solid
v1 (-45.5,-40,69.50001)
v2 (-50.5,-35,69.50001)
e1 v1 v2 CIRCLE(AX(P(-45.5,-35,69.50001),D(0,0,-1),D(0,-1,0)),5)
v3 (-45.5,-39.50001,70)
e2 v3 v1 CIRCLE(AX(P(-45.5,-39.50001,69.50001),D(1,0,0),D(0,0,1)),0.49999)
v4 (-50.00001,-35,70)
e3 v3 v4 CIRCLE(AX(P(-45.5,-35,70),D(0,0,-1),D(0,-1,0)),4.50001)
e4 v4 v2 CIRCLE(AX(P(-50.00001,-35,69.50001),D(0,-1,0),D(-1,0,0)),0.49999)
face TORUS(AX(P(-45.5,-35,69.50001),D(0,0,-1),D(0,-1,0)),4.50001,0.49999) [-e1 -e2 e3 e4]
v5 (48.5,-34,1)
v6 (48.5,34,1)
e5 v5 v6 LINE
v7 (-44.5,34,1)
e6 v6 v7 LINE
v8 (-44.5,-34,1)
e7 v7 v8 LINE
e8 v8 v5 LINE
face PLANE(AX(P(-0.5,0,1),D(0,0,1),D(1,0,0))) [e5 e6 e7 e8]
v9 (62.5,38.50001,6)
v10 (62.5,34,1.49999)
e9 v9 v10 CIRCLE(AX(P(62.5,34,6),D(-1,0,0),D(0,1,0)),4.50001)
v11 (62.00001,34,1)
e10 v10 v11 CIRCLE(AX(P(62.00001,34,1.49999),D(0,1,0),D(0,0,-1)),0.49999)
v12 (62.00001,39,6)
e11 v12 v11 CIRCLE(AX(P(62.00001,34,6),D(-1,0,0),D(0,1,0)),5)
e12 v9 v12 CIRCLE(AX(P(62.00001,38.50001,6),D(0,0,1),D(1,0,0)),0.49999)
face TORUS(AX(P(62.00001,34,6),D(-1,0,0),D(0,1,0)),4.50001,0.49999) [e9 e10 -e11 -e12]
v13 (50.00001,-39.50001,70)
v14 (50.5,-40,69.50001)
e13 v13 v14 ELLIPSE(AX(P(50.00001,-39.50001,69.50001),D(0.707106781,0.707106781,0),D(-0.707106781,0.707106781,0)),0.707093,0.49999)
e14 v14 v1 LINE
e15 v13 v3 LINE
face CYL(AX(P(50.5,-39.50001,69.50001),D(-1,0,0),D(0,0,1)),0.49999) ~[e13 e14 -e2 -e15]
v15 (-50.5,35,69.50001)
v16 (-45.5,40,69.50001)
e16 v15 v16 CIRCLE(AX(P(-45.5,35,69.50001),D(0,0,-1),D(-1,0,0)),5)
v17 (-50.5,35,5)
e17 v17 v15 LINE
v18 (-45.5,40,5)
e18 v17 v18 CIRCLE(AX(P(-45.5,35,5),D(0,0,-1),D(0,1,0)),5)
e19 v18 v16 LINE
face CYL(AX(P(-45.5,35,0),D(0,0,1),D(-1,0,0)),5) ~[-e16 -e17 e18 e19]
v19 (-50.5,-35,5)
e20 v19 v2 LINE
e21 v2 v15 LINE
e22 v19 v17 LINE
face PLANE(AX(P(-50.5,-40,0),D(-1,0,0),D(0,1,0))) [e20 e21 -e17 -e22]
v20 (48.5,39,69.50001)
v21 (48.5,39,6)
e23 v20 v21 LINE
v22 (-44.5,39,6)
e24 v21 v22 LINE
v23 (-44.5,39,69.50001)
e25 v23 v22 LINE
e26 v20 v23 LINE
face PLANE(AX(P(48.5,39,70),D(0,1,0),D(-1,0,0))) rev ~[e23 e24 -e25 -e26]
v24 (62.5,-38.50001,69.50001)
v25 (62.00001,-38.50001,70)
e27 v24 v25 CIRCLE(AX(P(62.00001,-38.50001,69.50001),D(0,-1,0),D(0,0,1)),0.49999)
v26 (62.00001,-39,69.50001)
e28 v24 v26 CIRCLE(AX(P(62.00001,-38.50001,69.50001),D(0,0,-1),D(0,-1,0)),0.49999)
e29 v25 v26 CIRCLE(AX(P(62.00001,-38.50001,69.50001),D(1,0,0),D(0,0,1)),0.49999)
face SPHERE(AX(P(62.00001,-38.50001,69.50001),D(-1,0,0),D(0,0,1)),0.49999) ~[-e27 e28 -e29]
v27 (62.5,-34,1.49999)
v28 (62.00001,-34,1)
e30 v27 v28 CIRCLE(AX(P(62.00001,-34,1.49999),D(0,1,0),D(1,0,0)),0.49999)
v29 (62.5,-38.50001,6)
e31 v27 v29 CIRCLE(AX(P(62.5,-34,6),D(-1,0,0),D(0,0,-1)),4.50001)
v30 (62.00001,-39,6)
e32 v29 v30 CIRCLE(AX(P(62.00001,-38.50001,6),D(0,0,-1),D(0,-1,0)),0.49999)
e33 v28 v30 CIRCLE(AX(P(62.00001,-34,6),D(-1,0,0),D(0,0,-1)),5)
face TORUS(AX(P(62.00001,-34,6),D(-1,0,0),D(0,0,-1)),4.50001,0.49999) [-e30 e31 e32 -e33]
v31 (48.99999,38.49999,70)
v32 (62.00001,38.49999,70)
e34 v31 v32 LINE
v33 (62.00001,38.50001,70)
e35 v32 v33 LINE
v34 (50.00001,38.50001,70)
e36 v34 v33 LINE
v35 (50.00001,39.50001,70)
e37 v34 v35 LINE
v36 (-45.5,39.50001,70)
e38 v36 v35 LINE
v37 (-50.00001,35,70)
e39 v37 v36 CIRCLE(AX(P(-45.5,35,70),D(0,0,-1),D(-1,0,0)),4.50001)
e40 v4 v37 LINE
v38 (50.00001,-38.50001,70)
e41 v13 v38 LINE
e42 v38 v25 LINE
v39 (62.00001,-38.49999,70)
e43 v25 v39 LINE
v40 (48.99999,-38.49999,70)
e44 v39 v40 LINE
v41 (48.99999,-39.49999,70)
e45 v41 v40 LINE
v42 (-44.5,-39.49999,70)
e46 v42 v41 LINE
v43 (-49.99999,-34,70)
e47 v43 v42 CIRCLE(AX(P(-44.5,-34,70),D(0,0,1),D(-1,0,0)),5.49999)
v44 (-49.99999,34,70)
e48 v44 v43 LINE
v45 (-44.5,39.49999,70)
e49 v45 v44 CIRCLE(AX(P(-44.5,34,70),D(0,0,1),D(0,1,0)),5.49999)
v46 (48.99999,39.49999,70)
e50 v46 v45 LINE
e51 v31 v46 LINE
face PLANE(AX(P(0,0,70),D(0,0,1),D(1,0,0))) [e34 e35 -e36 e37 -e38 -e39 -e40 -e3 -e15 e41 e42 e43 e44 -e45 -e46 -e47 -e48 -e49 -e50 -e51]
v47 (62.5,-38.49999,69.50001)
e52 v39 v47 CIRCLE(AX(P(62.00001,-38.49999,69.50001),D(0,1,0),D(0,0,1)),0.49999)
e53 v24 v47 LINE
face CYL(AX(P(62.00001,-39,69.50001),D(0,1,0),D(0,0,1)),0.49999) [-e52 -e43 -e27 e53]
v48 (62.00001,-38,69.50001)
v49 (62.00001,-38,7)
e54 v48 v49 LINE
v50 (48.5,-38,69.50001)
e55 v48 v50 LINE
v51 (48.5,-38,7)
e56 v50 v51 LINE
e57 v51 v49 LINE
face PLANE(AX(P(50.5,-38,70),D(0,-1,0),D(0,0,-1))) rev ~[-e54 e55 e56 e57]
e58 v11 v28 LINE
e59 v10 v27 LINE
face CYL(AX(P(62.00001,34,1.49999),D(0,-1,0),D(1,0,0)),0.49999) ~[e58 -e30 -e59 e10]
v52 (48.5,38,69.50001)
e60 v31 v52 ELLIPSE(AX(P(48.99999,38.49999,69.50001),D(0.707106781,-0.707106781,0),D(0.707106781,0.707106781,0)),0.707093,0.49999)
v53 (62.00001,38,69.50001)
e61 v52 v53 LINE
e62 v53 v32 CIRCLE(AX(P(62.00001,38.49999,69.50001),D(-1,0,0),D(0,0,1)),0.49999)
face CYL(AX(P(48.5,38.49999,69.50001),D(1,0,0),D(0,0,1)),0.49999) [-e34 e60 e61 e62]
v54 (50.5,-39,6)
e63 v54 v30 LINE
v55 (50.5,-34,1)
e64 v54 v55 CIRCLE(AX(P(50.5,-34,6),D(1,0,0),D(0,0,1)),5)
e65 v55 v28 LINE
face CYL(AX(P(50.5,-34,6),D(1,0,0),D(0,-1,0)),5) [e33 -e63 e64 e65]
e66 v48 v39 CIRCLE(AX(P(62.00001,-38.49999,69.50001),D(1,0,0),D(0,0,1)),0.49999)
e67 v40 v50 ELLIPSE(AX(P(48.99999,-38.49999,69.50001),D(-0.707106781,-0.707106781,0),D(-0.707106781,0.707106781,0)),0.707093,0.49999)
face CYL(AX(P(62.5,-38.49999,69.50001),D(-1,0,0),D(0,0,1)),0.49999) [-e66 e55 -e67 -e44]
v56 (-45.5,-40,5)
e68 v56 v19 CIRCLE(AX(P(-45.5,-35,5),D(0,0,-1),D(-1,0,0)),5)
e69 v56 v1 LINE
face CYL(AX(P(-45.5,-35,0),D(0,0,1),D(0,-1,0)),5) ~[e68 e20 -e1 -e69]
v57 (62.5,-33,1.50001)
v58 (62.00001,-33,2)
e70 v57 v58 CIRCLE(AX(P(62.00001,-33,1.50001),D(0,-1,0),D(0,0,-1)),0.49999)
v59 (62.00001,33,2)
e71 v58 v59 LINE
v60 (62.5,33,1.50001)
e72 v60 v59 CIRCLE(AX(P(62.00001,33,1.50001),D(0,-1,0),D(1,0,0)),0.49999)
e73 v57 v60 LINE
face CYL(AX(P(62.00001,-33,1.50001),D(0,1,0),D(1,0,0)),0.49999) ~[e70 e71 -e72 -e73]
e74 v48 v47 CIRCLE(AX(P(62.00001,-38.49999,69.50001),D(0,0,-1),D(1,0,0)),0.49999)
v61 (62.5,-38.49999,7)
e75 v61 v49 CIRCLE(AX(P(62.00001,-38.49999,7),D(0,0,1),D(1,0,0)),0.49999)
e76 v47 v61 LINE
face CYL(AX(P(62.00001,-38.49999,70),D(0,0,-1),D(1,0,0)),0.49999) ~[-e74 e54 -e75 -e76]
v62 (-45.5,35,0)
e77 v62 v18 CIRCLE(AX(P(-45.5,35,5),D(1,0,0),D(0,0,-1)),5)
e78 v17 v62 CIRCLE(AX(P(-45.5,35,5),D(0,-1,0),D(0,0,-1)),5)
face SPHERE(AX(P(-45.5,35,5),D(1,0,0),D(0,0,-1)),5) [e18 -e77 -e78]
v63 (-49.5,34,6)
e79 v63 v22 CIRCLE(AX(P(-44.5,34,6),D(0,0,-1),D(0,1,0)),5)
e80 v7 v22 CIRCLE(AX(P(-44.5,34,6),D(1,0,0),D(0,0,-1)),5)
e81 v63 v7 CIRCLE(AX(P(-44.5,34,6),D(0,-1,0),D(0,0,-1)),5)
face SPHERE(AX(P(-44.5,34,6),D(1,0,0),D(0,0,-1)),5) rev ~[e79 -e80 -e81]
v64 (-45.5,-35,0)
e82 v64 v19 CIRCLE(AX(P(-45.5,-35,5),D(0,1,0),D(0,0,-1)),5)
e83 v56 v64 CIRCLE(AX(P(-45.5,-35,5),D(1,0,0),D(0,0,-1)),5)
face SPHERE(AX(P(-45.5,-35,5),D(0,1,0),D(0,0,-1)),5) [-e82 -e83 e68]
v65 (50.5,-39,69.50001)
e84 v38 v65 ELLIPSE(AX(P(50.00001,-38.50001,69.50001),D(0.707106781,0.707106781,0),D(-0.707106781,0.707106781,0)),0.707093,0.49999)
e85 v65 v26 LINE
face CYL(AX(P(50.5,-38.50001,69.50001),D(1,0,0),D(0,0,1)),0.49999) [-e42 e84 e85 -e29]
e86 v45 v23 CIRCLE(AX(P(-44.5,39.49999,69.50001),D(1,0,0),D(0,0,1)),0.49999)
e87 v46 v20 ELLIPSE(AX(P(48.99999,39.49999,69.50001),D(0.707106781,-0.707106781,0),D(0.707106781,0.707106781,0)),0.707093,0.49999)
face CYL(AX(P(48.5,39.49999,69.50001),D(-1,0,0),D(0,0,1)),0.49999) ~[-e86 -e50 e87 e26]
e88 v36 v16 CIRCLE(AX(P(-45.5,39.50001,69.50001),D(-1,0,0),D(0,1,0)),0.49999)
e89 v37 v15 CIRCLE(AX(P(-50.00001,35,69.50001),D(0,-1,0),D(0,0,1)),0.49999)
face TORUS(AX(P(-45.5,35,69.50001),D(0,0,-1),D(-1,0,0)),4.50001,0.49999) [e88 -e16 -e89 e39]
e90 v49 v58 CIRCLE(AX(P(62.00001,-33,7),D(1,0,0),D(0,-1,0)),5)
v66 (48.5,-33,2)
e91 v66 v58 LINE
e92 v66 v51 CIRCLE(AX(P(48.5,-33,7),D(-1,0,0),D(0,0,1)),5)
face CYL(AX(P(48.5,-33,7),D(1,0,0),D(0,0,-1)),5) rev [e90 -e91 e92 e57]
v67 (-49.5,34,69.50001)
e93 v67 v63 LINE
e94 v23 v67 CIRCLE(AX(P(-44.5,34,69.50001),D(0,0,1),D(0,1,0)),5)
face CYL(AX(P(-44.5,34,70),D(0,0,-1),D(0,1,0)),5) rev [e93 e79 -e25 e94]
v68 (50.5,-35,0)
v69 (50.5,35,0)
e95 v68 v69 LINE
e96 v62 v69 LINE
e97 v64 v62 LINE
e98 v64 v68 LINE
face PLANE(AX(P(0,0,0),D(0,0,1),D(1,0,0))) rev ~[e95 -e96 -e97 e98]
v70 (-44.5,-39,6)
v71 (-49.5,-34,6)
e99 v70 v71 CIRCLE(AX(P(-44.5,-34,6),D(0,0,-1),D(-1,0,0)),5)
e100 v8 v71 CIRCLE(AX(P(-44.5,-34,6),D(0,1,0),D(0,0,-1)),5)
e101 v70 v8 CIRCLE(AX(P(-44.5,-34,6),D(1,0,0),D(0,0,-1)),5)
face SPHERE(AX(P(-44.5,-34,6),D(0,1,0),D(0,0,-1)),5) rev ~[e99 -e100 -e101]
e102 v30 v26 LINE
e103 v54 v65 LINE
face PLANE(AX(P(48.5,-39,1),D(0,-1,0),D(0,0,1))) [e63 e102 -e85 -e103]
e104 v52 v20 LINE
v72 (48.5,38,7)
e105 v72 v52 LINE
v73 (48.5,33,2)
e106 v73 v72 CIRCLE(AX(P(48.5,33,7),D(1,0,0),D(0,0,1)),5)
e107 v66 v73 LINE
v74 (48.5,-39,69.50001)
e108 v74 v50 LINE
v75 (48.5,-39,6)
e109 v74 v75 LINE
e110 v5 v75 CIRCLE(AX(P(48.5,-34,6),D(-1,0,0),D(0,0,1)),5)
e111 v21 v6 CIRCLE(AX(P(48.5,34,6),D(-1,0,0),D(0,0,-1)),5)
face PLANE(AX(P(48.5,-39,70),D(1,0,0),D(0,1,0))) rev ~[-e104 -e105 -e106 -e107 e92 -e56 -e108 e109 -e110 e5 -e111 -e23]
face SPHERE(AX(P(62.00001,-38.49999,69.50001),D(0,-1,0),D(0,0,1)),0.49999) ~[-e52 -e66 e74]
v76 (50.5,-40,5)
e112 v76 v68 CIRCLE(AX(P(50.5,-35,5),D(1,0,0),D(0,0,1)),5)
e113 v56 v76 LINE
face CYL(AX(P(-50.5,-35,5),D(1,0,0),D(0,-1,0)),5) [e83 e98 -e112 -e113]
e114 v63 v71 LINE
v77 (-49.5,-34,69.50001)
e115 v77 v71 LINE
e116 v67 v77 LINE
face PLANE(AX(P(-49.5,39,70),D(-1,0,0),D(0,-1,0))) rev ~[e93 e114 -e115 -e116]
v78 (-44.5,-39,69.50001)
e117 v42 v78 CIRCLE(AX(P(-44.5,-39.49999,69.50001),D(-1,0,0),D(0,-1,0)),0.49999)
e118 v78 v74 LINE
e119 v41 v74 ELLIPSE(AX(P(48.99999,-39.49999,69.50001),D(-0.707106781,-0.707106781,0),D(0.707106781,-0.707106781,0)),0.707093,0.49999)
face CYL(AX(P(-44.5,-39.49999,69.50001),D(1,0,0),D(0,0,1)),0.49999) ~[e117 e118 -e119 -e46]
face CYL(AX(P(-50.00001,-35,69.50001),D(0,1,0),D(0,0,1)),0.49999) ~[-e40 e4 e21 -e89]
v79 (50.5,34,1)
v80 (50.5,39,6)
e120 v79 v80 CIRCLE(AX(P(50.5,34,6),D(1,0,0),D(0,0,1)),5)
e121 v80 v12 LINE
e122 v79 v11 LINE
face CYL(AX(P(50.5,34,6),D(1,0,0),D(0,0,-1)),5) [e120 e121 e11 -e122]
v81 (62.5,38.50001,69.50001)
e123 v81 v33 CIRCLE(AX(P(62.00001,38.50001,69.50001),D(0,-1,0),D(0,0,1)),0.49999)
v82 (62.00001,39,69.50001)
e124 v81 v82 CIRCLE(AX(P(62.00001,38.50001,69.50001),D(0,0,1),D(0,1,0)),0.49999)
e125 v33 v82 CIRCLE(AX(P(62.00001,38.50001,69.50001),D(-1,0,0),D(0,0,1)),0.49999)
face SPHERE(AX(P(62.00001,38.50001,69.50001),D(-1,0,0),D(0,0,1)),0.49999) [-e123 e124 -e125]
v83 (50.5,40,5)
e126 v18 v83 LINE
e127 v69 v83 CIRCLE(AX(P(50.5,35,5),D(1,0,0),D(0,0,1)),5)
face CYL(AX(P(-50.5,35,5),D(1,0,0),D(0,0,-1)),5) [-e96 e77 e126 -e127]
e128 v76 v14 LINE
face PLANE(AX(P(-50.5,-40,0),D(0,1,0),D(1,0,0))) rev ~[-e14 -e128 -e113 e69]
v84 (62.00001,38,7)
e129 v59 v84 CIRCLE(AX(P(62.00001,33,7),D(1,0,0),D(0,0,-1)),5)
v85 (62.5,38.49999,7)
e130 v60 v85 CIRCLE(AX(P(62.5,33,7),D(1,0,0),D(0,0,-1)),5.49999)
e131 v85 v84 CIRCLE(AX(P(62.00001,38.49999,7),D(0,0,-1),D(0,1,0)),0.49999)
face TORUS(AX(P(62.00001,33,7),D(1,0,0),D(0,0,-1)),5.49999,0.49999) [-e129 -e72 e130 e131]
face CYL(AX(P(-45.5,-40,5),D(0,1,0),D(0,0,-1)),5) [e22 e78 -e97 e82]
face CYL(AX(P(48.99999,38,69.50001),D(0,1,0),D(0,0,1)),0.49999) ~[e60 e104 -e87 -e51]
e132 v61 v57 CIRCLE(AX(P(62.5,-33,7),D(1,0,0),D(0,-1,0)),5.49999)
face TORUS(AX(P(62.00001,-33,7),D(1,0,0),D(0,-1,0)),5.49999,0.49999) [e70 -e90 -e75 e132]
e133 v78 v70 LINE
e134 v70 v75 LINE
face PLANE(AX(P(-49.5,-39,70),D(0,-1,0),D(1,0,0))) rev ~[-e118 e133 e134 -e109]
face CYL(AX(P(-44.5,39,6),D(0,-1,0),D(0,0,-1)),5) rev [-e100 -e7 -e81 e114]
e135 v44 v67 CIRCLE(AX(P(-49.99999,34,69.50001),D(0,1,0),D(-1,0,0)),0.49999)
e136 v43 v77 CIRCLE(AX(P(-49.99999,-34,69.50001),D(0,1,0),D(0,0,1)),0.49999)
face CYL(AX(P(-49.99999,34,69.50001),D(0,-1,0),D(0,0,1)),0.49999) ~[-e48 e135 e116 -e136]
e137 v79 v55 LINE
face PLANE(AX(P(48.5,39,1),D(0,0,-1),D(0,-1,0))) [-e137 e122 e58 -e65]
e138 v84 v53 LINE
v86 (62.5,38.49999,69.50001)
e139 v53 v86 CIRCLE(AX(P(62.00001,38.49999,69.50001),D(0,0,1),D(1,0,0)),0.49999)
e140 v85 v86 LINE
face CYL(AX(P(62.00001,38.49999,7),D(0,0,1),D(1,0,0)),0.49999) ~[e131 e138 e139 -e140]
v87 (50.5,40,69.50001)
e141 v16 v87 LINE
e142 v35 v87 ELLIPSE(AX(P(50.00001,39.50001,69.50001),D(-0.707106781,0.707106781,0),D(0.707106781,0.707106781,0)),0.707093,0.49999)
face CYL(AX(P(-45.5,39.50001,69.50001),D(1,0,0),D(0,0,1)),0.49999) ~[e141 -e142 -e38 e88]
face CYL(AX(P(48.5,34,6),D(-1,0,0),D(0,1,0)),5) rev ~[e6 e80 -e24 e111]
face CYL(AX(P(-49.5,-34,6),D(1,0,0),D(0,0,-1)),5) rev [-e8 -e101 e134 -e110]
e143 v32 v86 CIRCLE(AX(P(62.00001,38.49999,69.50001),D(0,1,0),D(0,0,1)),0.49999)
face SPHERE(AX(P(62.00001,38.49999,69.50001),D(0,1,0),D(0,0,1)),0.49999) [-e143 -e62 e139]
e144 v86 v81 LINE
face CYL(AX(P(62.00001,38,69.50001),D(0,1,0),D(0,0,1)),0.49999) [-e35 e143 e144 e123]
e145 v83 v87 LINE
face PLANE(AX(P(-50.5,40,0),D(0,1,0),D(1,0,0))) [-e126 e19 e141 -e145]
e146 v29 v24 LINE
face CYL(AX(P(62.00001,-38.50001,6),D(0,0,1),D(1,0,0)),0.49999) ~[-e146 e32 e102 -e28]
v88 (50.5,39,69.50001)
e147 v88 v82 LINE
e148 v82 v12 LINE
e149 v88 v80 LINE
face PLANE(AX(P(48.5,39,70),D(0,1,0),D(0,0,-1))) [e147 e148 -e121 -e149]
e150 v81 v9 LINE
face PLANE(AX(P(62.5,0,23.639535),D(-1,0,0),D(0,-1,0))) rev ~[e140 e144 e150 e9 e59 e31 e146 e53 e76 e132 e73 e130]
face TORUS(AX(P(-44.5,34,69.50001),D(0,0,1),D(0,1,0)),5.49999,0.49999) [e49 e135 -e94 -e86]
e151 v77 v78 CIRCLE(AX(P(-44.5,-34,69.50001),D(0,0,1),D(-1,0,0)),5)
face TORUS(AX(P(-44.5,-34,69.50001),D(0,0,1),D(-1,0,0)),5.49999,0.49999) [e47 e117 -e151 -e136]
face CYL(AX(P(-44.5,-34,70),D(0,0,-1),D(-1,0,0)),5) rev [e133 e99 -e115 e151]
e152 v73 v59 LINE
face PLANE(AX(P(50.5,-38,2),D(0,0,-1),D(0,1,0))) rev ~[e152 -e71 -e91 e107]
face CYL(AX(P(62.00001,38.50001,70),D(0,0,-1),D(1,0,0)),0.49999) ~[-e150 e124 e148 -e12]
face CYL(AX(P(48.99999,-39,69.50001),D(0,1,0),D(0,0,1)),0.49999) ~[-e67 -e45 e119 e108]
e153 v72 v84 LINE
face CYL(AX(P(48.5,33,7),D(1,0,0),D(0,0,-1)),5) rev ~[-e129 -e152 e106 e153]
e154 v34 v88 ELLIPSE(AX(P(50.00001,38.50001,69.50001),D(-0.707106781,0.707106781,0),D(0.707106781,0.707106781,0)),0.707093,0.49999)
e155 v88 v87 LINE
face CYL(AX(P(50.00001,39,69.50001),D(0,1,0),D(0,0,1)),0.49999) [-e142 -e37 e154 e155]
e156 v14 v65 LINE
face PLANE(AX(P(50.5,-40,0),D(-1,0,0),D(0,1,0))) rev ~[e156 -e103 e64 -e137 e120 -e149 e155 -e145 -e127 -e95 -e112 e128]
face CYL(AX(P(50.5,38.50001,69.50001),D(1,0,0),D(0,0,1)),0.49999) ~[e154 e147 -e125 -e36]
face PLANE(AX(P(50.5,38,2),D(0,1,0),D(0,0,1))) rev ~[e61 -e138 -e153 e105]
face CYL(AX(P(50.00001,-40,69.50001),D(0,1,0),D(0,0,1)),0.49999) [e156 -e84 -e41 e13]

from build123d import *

# Parameters (mm, degrees)
F0_W     = 101
F0_H     = 80
F1_DEPTH = 70
F3_DEPTH = 69
F5_DEPTH = 2
F7_DEPTH = 14
F8_R     = 5
F9_R     = 0.49999


# Not quite as in the source:
# - a fillet or chamfer is up to 0.001 mm smaller than in the source, because OpenCascade refuses the exact size


with BuildPart() as f1:
    # F0 (on Top) → F1 (new body)
    with BuildSketch(Plane.XY):
        Rectangle(F0_W, F0_H)
    extrude(amount=F1_DEPTH)

    # F2 (on face) → F3 (cut)
    with BuildSketch(Plane.XY.offset(70)):
        Polygon((48.5, 39), (-49.5, 39), (-49.5, 20.586034283), (-49.5, -39), (48.5, -39), (48.5, -30.7030728576), align=None)
    extrude(amount=-F3_DEPTH, mode=Mode.SUBTRACT)

    # F4 (on face) → F5 (cut)
    with BuildSketch(Plane.YZ.offset(50.5)):
        Polygon((38, 2), (38, 70), (-38, 70), (-38, 42.2970801592), (-38, 2), align=None)
    extrude(amount=-F5_DEPTH, mode=Mode.SUBTRACT)

    # F6 (on face) → F7 (join)
    with BuildSketch(Plane(origin=(48.5, 0, 0), x_dir=(0, -1, 0), z_dir=(-1, 0, 0))):
        Polygon((39, 1), (39, 70), (38, 70), (38, 2), (-38, 2), (-38, 70), (-39, 70), (-39, 1), align=None)
    extrude(amount=-F7_DEPTH)

    # F8
    f8_edges = [f1.edges().sort_by_distance(p)[0] for p in [
        (-0.5, 39, 1),
        (-49.5, 0, 1),
        (-0.5, -39, 1),
        (0, 40, 0),
        (-50.5, 0, 0),
        (0, -40, 0),
        (-50.5, -40, 35),
        (-50.5, 40, 35),
        (-49.5, 39, 35.5),
        (-49.5, -39, 35.5),
        (56.5, 39, 1),
        (56.5, -39, 1),
        (55.5, -38, 2),
        (55.5, 38, 2),
    ]]
    fillet(f8_edges, radius=F8_R)

    # F9 (radius 0.5 in the source; OpenCascade refuses exactly that, so slightly less here)
    f9_edges = [f1.edges().sort_by_distance(p)[0] for p in [
        (2.5, 40, 70),
        (-49.035534, 38.535534, 70),
        (50.5, 39.5, 70),
        (-50.5, 0, 70),
        (56.5, 39, 70),
        (-49.035534, -38.535534, 70),
        (62.5, 38.5, 70),
        (2.5, -40, 70),
        (55.5, 38, 70),
        (50.5, -39.5, 70),
        (48.5, 38.5, 70),
        (56.5, -39, 70),
        (2, 39, 70),
        (62.5, -38.5, 70),
        (-48.035534, 37.535534, 70),
        (55.5, -38, 70),
        (-49.5, 0, 70),
        (48.5, -38.5, 70),
        (-48.035534, -37.535534, 70),
        (2, -39, 70),
        (62.5, -39, 38),
        (62.5, -37.535534, 2.464466),
        (62.5, 0, 1),
        (62.5, -38, 38.5),
        (62.5, 37.535534, 2.464466),
        (62.5, -36.535534, 3.464466),
        (62.5, 39, 38),
        (62.5, 0, 2),
        (62.5, 36.535534, 3.464466),
        (62.5, 38, 38.5),
    ]]
    fillet(f9_edges, radius=F9_R)


solid = f1.part
